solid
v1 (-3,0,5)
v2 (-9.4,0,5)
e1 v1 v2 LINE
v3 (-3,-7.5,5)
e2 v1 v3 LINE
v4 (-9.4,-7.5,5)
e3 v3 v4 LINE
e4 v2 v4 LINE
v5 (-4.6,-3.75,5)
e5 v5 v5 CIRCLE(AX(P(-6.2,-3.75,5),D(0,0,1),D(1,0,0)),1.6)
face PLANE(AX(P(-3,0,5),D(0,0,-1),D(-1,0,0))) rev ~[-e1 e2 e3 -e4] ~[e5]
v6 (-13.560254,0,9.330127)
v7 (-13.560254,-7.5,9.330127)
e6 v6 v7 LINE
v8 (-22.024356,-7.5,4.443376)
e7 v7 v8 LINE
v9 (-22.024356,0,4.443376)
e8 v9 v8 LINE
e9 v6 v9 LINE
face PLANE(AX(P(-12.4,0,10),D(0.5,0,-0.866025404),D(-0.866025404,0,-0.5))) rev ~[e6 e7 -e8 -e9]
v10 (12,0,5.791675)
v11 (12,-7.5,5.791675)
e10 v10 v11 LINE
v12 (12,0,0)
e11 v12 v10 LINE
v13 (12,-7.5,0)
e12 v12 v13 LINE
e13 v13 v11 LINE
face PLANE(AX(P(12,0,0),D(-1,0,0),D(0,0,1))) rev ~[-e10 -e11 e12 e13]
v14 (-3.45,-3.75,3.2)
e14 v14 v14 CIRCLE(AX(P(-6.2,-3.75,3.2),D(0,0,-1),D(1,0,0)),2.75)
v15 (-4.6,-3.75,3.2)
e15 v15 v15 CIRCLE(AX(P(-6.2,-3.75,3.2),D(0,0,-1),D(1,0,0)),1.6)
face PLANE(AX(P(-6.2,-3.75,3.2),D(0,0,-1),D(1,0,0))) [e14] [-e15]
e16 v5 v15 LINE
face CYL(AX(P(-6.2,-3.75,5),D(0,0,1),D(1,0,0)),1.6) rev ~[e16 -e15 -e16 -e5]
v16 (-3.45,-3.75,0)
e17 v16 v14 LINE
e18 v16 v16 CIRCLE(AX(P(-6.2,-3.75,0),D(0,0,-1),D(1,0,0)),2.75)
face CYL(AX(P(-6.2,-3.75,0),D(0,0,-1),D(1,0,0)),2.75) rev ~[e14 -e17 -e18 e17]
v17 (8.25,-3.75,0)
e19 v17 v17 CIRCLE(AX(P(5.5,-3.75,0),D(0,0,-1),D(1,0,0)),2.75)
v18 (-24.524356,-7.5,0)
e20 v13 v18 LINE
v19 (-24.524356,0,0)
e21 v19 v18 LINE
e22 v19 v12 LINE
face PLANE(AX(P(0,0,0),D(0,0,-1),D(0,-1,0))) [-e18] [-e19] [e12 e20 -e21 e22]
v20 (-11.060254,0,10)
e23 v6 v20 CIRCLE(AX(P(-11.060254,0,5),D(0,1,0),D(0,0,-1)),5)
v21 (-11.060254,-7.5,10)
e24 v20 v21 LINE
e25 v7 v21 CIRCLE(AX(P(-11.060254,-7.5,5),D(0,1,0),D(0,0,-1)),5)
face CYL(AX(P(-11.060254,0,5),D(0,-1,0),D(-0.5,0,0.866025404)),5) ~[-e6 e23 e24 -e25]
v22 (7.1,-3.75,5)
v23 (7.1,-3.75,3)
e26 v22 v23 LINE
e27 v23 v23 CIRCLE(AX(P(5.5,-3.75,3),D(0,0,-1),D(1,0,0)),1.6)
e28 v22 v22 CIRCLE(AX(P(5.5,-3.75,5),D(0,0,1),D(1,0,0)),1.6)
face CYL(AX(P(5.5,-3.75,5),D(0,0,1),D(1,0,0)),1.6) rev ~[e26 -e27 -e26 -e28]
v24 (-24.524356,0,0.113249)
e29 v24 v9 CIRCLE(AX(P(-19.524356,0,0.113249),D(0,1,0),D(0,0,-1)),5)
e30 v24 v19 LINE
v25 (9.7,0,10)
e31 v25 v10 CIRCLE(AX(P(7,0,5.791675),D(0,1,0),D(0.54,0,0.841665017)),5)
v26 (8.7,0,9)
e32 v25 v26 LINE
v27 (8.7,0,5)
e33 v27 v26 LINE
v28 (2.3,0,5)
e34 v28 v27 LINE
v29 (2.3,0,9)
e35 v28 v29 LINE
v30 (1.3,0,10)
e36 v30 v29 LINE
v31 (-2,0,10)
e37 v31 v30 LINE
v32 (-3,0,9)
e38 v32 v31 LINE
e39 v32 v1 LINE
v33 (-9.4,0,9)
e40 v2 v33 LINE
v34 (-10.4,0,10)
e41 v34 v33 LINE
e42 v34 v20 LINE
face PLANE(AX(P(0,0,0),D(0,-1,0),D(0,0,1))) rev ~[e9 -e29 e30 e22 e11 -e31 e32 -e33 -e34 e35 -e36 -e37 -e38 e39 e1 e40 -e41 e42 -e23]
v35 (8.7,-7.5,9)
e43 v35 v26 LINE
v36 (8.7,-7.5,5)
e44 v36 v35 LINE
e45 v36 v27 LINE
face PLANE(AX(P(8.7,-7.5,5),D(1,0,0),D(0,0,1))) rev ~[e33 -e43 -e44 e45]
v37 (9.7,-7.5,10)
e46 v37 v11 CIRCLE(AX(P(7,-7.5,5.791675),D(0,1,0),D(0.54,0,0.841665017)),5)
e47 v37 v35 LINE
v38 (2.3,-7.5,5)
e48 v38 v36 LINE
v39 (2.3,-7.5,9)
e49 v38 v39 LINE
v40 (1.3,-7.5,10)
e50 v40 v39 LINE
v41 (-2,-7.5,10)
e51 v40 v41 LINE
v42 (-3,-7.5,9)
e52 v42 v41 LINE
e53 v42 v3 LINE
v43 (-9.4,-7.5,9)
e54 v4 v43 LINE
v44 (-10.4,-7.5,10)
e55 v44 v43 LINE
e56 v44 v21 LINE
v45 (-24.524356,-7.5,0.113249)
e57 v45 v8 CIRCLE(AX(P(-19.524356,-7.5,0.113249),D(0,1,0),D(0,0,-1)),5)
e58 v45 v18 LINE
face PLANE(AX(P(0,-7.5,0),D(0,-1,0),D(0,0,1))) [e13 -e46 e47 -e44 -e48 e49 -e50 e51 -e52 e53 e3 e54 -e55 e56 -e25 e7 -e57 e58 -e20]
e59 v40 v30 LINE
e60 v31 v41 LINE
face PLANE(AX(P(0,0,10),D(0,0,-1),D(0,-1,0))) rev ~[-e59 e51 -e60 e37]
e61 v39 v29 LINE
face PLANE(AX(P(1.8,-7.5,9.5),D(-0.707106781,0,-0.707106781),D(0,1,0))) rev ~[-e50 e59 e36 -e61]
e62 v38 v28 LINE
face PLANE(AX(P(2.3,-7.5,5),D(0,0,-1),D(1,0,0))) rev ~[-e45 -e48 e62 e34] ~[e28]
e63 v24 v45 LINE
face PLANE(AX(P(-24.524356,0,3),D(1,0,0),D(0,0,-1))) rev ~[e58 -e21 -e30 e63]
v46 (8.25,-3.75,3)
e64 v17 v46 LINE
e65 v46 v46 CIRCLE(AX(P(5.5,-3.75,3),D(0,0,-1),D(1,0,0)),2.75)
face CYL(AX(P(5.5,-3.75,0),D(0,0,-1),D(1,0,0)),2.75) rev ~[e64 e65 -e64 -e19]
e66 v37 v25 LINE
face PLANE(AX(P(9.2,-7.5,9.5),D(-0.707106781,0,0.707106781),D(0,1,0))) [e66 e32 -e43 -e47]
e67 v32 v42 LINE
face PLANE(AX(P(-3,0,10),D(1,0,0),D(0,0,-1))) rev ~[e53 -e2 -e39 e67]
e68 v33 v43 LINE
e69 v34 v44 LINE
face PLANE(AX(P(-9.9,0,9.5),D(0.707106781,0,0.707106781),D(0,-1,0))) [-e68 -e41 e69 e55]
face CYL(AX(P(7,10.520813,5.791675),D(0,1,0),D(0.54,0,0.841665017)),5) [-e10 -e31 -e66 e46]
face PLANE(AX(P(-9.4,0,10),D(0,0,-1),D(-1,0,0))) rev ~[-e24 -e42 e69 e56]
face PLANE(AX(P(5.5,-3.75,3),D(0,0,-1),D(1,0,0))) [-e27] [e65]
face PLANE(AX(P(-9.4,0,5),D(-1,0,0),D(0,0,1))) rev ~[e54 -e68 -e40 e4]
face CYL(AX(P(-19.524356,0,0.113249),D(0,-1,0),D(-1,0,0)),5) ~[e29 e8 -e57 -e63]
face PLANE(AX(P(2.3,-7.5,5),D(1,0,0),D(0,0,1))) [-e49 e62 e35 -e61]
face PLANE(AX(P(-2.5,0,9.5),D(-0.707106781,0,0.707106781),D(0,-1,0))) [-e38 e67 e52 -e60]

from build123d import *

# Parameters (mm, degrees)
F1_DEPTH     = 7.5
F2_R         = 1.6
F3_DEPTH     = 5.001
F4_R         = 2.75
F4_R_2       = 1.6
F5_DEPTH     = 3.2
F6_R         = 5
F7_SIZE      = 1
F8_DEPTH     = 12
F9_W         = 6.4
F9_H         = 5
F10_DEPTH    = 7.501
F11_SIZE     = 1
F12_T1_DEPTH = 28.5416254125
F13_R        = 1.6
F14_DEPTH    = 5.001
F15_R        = 2.75
F15_R_2      = 1.6
F16_DEPTH    = 3


# Not quite as in the source:
# - a fillet or chamfer that OpenCascade refuses, or shapes differently, is made with other operations: its cross-section is extruded or revolved along the edge and cut away or added


with BuildPart() as f1:
    # F0 (on Front) → F1 (new body)
    with BuildSketch(Plane.XZ):
        Polygon((-24.524355653, 0), (0, 0), (0, 10), (-3, 10), (-3, 5), (-9.4, 5), (-9.4, 10), (-12.4, 10), (-24.524355653, 3), align=None)
    extrude(amount=F1_DEPTH)

    # F2 (on face) → F3 (cut, through all)
    with BuildSketch(Plane.XY.offset(5)):
        with Locations((-6.2, -3.75)):
            Circle(F2_R)
    extrude(amount=-F3_DEPTH, mode=Mode.SUBTRACT)

    # F4 (on face) → F5 (cut)
    with BuildSketch(Plane(origin=(0, 0, 0), x_dir=(1, 0, 0), z_dir=(0, 0, -1))):
        with Locations((-6.2, 3.75)):
            Circle(F4_R)
        with Locations((-6.2, 3.75)):
            Circle(F4_R_2, mode=Mode.SUBTRACT)
    extrude(amount=-F5_DEPTH, mode=Mode.SUBTRACT)

    # F6
    f6_edges = [f1.edges().sort_by_distance(p)[0] for p in [
        (-12.4, -3.75, 10),
        (-24.524356, -3.75, 3),
    ]]
    fillet(f6_edges, radius=F6_R)

    # F7
    f7_edges = [f1.edges().sort_by_distance(p)[0] for p in [
        (-9.4, -3.75, 10),
        (-3, -3.75, 10),
    ]]
    chamfer(f7_edges, length=F7_SIZE)

    # F8 (add): a face of the model
    f8_faces = [f1.faces().sort_by_distance(p)[0] for p in [
        (0, -3.75, 5),
    ]]
    extrude(f8_faces, amount=F8_DEPTH)

    # F9 (on face) → F10 (cut, through all)
    with BuildSketch(Plane.XZ.offset(7.5)):
        with Locations((5.5, 7.5)):
            Rectangle(F9_W, F9_H)
    extrude(amount=-F10_DEPTH, mode=Mode.SUBTRACT)

    # F11
    f11_edges = [f1.edges().sort_by_distance(p)[0] for p in [
        (2.3, -3.75, 10),
        (8.7, -3.75, 10),
    ]]
    chamfer(f11_edges, length=F11_SIZE)

    # F12: fillet of radius 5 on 1 edges, made by hand

    # F12_s2 → F12_t1 (cut)
    with BuildSketch(Plane.XZ.offset(-10.5208127063)):
        with BuildLine():
            ThreePointArc((9.7, 10), (11.3874821937, 8.1895906792), (12, 5.7916749175))
            Line((12, 5.7916749175), (12, 10))
            Line((12, 10), (9.7, 10))
        make_face()
    extrude(amount=F12_T1_DEPTH, mode=Mode.SUBTRACT)

    # F13 (on face) → F14 (cut, through all)
    with BuildSketch(Plane.XY.offset(5)):
        with Locations((5.5, -3.75)):
            Circle(F13_R)
    extrude(amount=-F14_DEPTH, mode=Mode.SUBTRACT)

    # F15 (on face) → F16 (cut)
    with BuildSketch(Plane(origin=(0, 0, 0), x_dir=(1, 0, 0), z_dir=(0, 0, -1))):
        with Locations((5.5, 3.75)):
            Circle(F15_R)
        with Locations((5.5, 3.75)):
            Circle(F15_R_2, mode=Mode.SUBTRACT)
    extrude(amount=-F16_DEPTH, mode=Mode.SUBTRACT)


solid = f1.part
